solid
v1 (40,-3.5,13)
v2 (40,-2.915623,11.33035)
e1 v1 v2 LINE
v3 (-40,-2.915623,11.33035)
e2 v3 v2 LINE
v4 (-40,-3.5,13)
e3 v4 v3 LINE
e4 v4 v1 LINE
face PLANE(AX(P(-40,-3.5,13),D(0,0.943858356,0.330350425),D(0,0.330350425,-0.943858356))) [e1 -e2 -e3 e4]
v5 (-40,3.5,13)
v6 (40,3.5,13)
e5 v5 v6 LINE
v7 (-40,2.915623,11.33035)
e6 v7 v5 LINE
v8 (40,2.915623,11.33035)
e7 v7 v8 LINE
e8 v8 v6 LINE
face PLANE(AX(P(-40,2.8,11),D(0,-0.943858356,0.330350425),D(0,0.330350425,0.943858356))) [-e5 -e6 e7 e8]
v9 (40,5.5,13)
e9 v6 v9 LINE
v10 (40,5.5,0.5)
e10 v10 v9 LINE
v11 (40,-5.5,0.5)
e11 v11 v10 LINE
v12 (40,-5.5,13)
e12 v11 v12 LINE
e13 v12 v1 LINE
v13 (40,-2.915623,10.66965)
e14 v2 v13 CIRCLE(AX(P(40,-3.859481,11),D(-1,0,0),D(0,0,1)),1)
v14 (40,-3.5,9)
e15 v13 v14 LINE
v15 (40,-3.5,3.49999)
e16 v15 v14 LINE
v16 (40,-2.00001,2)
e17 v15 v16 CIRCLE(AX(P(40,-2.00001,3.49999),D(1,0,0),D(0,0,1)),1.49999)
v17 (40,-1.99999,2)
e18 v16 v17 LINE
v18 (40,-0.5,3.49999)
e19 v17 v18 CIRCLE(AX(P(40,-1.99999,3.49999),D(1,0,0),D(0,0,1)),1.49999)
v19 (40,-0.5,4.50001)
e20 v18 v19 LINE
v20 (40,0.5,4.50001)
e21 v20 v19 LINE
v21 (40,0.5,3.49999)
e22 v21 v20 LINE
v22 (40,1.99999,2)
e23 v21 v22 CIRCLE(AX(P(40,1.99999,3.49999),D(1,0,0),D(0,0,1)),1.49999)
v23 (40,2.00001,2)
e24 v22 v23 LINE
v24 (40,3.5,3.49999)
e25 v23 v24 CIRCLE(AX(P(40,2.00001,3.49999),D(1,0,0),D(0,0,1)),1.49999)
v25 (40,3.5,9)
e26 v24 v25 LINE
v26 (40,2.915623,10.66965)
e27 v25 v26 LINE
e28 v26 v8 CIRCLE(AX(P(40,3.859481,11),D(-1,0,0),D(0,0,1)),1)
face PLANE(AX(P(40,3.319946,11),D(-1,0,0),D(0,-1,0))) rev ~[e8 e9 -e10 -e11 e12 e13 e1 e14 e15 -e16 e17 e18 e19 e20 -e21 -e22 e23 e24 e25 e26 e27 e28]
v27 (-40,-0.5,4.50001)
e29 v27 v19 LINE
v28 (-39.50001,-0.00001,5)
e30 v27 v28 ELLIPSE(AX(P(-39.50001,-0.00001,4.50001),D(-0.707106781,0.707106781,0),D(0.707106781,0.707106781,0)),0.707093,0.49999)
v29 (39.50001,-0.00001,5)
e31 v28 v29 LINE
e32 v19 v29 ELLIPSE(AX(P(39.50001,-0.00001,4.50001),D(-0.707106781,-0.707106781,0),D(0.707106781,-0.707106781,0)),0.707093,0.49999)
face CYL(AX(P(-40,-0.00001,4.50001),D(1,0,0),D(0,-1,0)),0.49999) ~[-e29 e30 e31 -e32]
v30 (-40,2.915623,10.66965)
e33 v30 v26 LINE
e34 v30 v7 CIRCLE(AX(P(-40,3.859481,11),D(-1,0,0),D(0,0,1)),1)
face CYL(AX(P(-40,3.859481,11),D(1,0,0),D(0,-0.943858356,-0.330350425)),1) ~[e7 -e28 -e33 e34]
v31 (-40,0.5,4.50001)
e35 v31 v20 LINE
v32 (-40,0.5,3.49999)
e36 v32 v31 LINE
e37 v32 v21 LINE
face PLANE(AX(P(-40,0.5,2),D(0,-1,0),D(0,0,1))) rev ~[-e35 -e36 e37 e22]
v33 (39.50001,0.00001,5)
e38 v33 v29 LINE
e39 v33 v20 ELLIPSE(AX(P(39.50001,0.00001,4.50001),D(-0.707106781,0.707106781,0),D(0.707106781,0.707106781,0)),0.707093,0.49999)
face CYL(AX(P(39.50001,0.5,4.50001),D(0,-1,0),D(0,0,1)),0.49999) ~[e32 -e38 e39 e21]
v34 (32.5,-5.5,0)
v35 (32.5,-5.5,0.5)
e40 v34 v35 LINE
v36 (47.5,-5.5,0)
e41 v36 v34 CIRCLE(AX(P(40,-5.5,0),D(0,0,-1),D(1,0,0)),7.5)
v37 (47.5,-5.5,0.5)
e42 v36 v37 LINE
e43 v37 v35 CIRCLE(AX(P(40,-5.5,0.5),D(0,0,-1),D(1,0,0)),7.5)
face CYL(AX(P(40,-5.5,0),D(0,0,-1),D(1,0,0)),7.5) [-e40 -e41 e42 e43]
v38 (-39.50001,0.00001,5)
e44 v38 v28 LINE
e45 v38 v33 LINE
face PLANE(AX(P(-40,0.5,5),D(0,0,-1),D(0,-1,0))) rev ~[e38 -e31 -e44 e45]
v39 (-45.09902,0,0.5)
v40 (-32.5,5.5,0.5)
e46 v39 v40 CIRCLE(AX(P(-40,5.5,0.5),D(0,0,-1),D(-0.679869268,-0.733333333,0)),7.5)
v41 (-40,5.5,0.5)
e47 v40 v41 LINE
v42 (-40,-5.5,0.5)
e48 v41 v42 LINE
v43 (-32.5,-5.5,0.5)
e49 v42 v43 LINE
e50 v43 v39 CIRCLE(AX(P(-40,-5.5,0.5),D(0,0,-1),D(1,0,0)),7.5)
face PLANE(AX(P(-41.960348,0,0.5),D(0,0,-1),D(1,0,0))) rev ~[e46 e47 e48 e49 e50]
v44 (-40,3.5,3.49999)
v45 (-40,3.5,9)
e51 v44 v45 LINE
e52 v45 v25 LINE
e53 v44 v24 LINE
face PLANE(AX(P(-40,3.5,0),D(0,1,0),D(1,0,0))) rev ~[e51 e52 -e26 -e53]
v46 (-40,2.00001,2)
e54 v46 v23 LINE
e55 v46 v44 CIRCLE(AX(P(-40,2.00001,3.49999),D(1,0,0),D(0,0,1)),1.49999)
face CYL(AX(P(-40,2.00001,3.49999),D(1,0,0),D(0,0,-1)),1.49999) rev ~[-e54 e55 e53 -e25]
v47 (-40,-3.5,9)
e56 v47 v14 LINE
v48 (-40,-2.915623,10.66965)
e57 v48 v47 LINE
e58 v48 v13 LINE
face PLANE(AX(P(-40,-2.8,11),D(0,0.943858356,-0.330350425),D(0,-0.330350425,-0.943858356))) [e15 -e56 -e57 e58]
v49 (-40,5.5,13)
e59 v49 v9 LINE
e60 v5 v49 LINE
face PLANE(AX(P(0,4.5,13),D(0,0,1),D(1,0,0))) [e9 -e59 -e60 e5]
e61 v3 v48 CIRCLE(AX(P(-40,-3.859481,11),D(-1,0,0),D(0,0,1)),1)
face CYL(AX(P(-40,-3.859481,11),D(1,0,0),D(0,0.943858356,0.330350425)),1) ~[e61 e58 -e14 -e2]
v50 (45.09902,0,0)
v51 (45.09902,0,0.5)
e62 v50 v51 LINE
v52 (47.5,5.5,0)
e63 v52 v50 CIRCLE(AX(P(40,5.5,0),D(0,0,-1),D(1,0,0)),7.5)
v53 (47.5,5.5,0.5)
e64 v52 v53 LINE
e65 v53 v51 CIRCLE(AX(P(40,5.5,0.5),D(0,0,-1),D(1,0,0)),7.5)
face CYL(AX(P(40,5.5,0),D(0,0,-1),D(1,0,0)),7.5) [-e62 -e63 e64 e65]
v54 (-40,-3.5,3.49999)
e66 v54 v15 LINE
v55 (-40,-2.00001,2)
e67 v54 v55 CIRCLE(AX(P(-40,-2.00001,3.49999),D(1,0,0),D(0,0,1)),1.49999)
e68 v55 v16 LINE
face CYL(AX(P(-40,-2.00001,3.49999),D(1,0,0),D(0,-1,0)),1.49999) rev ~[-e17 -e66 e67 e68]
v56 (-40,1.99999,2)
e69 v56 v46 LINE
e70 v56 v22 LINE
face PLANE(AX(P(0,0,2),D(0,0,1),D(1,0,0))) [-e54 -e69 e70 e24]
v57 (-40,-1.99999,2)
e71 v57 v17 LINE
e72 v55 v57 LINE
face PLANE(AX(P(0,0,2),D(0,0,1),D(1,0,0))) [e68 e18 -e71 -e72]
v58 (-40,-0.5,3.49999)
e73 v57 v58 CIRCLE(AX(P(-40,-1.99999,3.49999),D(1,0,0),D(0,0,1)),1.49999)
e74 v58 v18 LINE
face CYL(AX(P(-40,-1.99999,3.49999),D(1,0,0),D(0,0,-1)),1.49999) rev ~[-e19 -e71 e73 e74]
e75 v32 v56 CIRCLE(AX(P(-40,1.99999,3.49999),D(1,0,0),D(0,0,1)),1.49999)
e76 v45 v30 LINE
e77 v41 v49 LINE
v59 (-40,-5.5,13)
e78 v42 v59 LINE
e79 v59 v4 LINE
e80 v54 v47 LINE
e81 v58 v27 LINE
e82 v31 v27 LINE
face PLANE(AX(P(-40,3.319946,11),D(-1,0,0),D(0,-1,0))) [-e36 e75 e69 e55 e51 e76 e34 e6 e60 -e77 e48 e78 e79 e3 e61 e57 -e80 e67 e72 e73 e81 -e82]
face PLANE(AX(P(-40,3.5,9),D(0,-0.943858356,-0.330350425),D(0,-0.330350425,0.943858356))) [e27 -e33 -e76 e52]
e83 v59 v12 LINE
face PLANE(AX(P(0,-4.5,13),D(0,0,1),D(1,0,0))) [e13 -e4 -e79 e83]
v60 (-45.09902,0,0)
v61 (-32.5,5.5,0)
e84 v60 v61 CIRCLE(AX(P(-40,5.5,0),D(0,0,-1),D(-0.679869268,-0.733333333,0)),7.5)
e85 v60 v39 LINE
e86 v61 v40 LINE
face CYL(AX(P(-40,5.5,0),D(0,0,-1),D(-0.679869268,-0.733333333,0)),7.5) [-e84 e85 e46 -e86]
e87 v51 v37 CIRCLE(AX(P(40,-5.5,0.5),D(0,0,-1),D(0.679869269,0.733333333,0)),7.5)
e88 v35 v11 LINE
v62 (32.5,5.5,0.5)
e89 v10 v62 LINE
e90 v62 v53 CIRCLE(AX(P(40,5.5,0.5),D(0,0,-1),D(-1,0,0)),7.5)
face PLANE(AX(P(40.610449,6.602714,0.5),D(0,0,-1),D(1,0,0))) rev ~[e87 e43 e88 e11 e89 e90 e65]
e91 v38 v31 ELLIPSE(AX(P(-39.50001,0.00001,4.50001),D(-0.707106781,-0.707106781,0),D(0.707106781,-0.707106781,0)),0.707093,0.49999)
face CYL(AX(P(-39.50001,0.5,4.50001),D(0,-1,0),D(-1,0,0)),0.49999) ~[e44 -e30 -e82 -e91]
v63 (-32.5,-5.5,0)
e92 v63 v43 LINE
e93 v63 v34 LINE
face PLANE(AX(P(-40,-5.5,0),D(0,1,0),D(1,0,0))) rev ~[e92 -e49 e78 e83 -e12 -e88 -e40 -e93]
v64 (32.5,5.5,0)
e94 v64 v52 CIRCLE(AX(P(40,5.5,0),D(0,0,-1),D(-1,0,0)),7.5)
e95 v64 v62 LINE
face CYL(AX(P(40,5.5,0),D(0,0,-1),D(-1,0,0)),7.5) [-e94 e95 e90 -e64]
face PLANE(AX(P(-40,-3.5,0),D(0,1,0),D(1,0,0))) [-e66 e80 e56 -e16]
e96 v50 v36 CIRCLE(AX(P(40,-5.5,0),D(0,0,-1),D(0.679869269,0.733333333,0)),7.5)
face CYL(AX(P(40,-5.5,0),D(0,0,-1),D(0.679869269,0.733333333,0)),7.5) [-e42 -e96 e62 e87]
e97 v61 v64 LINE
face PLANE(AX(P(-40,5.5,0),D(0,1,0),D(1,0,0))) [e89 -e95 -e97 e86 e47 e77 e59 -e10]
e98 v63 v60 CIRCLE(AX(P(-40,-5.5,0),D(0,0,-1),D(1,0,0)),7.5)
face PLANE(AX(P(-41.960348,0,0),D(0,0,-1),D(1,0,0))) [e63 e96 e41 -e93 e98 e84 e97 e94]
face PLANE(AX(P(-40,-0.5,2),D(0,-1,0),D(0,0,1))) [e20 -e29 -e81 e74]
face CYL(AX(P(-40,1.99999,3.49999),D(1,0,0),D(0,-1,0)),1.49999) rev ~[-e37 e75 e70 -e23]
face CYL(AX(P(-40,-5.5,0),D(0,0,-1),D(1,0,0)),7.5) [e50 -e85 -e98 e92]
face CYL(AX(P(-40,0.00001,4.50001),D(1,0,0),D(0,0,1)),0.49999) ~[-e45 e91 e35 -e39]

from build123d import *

# Parameters (mm, degrees)
F0_W      = 80
F0_H      = 7
F1_DEPTH  = 2
F0_H_2    = 2
F2_DEPTH  = 13
F3_W      = 1
F3_H      = 3
F4_DEPTH  = 80
F5_R      = 1
F6_R      = 1
F7_R      = 1.49999
F8_R      = 0.49999
F10_DEPTH = 0.5


# Not quite as in the source:
# - a fillet or chamfer is up to 0.001 mm smaller than in the source, because OpenCascade refuses the exact size
# - a feature names something its author has since deleted; it is built from what else it names


with BuildPart() as f1:
    # F0 (on Top) → F1 (new body)
    with BuildSketch(Plane.XY):
        Rectangle(F0_W, F0_H)
    extrude(amount=F1_DEPTH)

    # F0 (on Top) → F2 (join)
    with BuildSketch(Plane.XY):
        with Locations((0, 4.5)):
            Rectangle(F0_W, F0_H_2)
        with Locations((0, -4.5)):
            Rectangle(F0_W, F0_H_2)
    extrude(amount=F2_DEPTH)

    # F3 (on face) → F4 (join)
    with BuildSketch(Plane(origin=(-40, 0, 0), x_dir=(0, -1, 0), z_dir=(-1, 0, 0))):
        Polygon((-3.5, 13), (-3.5, 9), (-2.8, 11), align=None)
        Polygon((2.8, 11), (3.5, 9), (3.5, 13), align=None)
        with Locations((0, 3.5)):
            Rectangle(F3_W, F3_H)
    extrude(amount=-F4_DEPTH)

    # F5
    f5_edges = [f1.edges().sort_by_distance(p)[0] for p in [
        (0, 2.8, 11),
    ]]
    fillet(f5_edges, radius=F5_R)

    # F6
    f6_edges = [f1.edges().sort_by_distance(p)[0] for p in [
        (0, -2.8, 11),
    ]]
    fillet(f6_edges, radius=F6_R)

    # F7 (radius 1.5 in the source; OpenCascade refuses exactly that, so slightly less here)
    f7_edges = [f1.edges().sort_by_distance(p)[0] for p in [
        (0, -3.5, 2),
        (0, 3.5, 2),
        (0, -0.5, 2),
        (0, 0.5, 2),
    ]]
    fillet(f7_edges, radius=F7_R)

    # F8 (radius 0.5 in the source; OpenCascade refuses exactly that, so slightly less here)
    f8_edges = [f1.edges().sort_by_distance(p)[0] for p in [
        (0, -0.5, 5),
        (0, 0.5, 5),
        (-40, 0, 5),
        (40, 0, 5),
    ]]
    fillet(f8_edges, radius=F8_R)

    # F9 (on face) → F10 (join)
    with BuildSketch(Plane(origin=(0, 0, 0), x_dir=(1, 0, 0), z_dir=(0, 0, -1))):
        with BuildLine():
            ThreePointArc((-40, 2), (-42.7386127875, 1.4821200219), (-45.0990195136, 0))
            ThreePointArc((-45.0990195136, 0), (-42.7386127875, -1.4821200219), (-40, -2))
            Line((-40, -2), (-40, 2))
        make_face()
        with BuildLine():
            Line((-40, 5.5), (-32.5, 5.5))
            ThreePointArc((-32.5, 5.5), (-43.0006127414, 12.3735960876), (-45.0990195136, 0))
            ThreePointArc((-45.0990195136, 0), (-42.7386127875, 1.4821200219), (-40, 2))
            Line((-40, 2), (-40, 5.5))
        make_face()
        with BuildLine():
            ThreePointArc((-40, -2), (-42.7386127875, -1.4821200219), (-45.0990195136, 0))
            ThreePointArc((-45.0990195136, 0), (-43.0006127414, -12.3735960876), (-32.5, -5.5))
            Line((-32.5, -5.5), (-40, -5.5))
            Line((-40, -5.5), (-40, -2))
        make_face()
        with BuildLine():
            Line((40, -5.5), (32.5, -5.5))
            ThreePointArc((32.5, -5.5), (40, -13), (47.5, -5.5))
            ThreePointArc((47.5, -5.5), (46.8735960876, -2.4993872586), (45.0990195136, 0))
            ThreePointArc((45.0990195136, 0), (42.7386127875, -1.4821200219), (40, -2))
            Line((40, -2), (40, -5.5))
        make_face()
        with BuildLine():
            ThreePointArc((40, -2), (42.7386127875, -1.4821200219), (45.0990195136, 0))
            ThreePointArc((45.0990195136, 0), (42.7386127875, 1.4821200219), (40, 2))
            Line((40, 2), (40, -2))
        make_face()
        with BuildLine():
            ThreePointArc((47.5, 5.5), (40, 13), (32.5, 5.5))
            Line((32.5, 5.5), (40, 5.5))
            Line((40, 5.5), (40, 2))
            ThreePointArc((40, 2), (42.7386127875, 1.4821200219), (45.0990195136, 0))
            ThreePointArc((45.0990195136, 0), (46.8735960876, 2.4993872586), (47.5, 5.5))
        make_face()
    extrude(amount=-F10_DEPTH)


solid = f1.part
